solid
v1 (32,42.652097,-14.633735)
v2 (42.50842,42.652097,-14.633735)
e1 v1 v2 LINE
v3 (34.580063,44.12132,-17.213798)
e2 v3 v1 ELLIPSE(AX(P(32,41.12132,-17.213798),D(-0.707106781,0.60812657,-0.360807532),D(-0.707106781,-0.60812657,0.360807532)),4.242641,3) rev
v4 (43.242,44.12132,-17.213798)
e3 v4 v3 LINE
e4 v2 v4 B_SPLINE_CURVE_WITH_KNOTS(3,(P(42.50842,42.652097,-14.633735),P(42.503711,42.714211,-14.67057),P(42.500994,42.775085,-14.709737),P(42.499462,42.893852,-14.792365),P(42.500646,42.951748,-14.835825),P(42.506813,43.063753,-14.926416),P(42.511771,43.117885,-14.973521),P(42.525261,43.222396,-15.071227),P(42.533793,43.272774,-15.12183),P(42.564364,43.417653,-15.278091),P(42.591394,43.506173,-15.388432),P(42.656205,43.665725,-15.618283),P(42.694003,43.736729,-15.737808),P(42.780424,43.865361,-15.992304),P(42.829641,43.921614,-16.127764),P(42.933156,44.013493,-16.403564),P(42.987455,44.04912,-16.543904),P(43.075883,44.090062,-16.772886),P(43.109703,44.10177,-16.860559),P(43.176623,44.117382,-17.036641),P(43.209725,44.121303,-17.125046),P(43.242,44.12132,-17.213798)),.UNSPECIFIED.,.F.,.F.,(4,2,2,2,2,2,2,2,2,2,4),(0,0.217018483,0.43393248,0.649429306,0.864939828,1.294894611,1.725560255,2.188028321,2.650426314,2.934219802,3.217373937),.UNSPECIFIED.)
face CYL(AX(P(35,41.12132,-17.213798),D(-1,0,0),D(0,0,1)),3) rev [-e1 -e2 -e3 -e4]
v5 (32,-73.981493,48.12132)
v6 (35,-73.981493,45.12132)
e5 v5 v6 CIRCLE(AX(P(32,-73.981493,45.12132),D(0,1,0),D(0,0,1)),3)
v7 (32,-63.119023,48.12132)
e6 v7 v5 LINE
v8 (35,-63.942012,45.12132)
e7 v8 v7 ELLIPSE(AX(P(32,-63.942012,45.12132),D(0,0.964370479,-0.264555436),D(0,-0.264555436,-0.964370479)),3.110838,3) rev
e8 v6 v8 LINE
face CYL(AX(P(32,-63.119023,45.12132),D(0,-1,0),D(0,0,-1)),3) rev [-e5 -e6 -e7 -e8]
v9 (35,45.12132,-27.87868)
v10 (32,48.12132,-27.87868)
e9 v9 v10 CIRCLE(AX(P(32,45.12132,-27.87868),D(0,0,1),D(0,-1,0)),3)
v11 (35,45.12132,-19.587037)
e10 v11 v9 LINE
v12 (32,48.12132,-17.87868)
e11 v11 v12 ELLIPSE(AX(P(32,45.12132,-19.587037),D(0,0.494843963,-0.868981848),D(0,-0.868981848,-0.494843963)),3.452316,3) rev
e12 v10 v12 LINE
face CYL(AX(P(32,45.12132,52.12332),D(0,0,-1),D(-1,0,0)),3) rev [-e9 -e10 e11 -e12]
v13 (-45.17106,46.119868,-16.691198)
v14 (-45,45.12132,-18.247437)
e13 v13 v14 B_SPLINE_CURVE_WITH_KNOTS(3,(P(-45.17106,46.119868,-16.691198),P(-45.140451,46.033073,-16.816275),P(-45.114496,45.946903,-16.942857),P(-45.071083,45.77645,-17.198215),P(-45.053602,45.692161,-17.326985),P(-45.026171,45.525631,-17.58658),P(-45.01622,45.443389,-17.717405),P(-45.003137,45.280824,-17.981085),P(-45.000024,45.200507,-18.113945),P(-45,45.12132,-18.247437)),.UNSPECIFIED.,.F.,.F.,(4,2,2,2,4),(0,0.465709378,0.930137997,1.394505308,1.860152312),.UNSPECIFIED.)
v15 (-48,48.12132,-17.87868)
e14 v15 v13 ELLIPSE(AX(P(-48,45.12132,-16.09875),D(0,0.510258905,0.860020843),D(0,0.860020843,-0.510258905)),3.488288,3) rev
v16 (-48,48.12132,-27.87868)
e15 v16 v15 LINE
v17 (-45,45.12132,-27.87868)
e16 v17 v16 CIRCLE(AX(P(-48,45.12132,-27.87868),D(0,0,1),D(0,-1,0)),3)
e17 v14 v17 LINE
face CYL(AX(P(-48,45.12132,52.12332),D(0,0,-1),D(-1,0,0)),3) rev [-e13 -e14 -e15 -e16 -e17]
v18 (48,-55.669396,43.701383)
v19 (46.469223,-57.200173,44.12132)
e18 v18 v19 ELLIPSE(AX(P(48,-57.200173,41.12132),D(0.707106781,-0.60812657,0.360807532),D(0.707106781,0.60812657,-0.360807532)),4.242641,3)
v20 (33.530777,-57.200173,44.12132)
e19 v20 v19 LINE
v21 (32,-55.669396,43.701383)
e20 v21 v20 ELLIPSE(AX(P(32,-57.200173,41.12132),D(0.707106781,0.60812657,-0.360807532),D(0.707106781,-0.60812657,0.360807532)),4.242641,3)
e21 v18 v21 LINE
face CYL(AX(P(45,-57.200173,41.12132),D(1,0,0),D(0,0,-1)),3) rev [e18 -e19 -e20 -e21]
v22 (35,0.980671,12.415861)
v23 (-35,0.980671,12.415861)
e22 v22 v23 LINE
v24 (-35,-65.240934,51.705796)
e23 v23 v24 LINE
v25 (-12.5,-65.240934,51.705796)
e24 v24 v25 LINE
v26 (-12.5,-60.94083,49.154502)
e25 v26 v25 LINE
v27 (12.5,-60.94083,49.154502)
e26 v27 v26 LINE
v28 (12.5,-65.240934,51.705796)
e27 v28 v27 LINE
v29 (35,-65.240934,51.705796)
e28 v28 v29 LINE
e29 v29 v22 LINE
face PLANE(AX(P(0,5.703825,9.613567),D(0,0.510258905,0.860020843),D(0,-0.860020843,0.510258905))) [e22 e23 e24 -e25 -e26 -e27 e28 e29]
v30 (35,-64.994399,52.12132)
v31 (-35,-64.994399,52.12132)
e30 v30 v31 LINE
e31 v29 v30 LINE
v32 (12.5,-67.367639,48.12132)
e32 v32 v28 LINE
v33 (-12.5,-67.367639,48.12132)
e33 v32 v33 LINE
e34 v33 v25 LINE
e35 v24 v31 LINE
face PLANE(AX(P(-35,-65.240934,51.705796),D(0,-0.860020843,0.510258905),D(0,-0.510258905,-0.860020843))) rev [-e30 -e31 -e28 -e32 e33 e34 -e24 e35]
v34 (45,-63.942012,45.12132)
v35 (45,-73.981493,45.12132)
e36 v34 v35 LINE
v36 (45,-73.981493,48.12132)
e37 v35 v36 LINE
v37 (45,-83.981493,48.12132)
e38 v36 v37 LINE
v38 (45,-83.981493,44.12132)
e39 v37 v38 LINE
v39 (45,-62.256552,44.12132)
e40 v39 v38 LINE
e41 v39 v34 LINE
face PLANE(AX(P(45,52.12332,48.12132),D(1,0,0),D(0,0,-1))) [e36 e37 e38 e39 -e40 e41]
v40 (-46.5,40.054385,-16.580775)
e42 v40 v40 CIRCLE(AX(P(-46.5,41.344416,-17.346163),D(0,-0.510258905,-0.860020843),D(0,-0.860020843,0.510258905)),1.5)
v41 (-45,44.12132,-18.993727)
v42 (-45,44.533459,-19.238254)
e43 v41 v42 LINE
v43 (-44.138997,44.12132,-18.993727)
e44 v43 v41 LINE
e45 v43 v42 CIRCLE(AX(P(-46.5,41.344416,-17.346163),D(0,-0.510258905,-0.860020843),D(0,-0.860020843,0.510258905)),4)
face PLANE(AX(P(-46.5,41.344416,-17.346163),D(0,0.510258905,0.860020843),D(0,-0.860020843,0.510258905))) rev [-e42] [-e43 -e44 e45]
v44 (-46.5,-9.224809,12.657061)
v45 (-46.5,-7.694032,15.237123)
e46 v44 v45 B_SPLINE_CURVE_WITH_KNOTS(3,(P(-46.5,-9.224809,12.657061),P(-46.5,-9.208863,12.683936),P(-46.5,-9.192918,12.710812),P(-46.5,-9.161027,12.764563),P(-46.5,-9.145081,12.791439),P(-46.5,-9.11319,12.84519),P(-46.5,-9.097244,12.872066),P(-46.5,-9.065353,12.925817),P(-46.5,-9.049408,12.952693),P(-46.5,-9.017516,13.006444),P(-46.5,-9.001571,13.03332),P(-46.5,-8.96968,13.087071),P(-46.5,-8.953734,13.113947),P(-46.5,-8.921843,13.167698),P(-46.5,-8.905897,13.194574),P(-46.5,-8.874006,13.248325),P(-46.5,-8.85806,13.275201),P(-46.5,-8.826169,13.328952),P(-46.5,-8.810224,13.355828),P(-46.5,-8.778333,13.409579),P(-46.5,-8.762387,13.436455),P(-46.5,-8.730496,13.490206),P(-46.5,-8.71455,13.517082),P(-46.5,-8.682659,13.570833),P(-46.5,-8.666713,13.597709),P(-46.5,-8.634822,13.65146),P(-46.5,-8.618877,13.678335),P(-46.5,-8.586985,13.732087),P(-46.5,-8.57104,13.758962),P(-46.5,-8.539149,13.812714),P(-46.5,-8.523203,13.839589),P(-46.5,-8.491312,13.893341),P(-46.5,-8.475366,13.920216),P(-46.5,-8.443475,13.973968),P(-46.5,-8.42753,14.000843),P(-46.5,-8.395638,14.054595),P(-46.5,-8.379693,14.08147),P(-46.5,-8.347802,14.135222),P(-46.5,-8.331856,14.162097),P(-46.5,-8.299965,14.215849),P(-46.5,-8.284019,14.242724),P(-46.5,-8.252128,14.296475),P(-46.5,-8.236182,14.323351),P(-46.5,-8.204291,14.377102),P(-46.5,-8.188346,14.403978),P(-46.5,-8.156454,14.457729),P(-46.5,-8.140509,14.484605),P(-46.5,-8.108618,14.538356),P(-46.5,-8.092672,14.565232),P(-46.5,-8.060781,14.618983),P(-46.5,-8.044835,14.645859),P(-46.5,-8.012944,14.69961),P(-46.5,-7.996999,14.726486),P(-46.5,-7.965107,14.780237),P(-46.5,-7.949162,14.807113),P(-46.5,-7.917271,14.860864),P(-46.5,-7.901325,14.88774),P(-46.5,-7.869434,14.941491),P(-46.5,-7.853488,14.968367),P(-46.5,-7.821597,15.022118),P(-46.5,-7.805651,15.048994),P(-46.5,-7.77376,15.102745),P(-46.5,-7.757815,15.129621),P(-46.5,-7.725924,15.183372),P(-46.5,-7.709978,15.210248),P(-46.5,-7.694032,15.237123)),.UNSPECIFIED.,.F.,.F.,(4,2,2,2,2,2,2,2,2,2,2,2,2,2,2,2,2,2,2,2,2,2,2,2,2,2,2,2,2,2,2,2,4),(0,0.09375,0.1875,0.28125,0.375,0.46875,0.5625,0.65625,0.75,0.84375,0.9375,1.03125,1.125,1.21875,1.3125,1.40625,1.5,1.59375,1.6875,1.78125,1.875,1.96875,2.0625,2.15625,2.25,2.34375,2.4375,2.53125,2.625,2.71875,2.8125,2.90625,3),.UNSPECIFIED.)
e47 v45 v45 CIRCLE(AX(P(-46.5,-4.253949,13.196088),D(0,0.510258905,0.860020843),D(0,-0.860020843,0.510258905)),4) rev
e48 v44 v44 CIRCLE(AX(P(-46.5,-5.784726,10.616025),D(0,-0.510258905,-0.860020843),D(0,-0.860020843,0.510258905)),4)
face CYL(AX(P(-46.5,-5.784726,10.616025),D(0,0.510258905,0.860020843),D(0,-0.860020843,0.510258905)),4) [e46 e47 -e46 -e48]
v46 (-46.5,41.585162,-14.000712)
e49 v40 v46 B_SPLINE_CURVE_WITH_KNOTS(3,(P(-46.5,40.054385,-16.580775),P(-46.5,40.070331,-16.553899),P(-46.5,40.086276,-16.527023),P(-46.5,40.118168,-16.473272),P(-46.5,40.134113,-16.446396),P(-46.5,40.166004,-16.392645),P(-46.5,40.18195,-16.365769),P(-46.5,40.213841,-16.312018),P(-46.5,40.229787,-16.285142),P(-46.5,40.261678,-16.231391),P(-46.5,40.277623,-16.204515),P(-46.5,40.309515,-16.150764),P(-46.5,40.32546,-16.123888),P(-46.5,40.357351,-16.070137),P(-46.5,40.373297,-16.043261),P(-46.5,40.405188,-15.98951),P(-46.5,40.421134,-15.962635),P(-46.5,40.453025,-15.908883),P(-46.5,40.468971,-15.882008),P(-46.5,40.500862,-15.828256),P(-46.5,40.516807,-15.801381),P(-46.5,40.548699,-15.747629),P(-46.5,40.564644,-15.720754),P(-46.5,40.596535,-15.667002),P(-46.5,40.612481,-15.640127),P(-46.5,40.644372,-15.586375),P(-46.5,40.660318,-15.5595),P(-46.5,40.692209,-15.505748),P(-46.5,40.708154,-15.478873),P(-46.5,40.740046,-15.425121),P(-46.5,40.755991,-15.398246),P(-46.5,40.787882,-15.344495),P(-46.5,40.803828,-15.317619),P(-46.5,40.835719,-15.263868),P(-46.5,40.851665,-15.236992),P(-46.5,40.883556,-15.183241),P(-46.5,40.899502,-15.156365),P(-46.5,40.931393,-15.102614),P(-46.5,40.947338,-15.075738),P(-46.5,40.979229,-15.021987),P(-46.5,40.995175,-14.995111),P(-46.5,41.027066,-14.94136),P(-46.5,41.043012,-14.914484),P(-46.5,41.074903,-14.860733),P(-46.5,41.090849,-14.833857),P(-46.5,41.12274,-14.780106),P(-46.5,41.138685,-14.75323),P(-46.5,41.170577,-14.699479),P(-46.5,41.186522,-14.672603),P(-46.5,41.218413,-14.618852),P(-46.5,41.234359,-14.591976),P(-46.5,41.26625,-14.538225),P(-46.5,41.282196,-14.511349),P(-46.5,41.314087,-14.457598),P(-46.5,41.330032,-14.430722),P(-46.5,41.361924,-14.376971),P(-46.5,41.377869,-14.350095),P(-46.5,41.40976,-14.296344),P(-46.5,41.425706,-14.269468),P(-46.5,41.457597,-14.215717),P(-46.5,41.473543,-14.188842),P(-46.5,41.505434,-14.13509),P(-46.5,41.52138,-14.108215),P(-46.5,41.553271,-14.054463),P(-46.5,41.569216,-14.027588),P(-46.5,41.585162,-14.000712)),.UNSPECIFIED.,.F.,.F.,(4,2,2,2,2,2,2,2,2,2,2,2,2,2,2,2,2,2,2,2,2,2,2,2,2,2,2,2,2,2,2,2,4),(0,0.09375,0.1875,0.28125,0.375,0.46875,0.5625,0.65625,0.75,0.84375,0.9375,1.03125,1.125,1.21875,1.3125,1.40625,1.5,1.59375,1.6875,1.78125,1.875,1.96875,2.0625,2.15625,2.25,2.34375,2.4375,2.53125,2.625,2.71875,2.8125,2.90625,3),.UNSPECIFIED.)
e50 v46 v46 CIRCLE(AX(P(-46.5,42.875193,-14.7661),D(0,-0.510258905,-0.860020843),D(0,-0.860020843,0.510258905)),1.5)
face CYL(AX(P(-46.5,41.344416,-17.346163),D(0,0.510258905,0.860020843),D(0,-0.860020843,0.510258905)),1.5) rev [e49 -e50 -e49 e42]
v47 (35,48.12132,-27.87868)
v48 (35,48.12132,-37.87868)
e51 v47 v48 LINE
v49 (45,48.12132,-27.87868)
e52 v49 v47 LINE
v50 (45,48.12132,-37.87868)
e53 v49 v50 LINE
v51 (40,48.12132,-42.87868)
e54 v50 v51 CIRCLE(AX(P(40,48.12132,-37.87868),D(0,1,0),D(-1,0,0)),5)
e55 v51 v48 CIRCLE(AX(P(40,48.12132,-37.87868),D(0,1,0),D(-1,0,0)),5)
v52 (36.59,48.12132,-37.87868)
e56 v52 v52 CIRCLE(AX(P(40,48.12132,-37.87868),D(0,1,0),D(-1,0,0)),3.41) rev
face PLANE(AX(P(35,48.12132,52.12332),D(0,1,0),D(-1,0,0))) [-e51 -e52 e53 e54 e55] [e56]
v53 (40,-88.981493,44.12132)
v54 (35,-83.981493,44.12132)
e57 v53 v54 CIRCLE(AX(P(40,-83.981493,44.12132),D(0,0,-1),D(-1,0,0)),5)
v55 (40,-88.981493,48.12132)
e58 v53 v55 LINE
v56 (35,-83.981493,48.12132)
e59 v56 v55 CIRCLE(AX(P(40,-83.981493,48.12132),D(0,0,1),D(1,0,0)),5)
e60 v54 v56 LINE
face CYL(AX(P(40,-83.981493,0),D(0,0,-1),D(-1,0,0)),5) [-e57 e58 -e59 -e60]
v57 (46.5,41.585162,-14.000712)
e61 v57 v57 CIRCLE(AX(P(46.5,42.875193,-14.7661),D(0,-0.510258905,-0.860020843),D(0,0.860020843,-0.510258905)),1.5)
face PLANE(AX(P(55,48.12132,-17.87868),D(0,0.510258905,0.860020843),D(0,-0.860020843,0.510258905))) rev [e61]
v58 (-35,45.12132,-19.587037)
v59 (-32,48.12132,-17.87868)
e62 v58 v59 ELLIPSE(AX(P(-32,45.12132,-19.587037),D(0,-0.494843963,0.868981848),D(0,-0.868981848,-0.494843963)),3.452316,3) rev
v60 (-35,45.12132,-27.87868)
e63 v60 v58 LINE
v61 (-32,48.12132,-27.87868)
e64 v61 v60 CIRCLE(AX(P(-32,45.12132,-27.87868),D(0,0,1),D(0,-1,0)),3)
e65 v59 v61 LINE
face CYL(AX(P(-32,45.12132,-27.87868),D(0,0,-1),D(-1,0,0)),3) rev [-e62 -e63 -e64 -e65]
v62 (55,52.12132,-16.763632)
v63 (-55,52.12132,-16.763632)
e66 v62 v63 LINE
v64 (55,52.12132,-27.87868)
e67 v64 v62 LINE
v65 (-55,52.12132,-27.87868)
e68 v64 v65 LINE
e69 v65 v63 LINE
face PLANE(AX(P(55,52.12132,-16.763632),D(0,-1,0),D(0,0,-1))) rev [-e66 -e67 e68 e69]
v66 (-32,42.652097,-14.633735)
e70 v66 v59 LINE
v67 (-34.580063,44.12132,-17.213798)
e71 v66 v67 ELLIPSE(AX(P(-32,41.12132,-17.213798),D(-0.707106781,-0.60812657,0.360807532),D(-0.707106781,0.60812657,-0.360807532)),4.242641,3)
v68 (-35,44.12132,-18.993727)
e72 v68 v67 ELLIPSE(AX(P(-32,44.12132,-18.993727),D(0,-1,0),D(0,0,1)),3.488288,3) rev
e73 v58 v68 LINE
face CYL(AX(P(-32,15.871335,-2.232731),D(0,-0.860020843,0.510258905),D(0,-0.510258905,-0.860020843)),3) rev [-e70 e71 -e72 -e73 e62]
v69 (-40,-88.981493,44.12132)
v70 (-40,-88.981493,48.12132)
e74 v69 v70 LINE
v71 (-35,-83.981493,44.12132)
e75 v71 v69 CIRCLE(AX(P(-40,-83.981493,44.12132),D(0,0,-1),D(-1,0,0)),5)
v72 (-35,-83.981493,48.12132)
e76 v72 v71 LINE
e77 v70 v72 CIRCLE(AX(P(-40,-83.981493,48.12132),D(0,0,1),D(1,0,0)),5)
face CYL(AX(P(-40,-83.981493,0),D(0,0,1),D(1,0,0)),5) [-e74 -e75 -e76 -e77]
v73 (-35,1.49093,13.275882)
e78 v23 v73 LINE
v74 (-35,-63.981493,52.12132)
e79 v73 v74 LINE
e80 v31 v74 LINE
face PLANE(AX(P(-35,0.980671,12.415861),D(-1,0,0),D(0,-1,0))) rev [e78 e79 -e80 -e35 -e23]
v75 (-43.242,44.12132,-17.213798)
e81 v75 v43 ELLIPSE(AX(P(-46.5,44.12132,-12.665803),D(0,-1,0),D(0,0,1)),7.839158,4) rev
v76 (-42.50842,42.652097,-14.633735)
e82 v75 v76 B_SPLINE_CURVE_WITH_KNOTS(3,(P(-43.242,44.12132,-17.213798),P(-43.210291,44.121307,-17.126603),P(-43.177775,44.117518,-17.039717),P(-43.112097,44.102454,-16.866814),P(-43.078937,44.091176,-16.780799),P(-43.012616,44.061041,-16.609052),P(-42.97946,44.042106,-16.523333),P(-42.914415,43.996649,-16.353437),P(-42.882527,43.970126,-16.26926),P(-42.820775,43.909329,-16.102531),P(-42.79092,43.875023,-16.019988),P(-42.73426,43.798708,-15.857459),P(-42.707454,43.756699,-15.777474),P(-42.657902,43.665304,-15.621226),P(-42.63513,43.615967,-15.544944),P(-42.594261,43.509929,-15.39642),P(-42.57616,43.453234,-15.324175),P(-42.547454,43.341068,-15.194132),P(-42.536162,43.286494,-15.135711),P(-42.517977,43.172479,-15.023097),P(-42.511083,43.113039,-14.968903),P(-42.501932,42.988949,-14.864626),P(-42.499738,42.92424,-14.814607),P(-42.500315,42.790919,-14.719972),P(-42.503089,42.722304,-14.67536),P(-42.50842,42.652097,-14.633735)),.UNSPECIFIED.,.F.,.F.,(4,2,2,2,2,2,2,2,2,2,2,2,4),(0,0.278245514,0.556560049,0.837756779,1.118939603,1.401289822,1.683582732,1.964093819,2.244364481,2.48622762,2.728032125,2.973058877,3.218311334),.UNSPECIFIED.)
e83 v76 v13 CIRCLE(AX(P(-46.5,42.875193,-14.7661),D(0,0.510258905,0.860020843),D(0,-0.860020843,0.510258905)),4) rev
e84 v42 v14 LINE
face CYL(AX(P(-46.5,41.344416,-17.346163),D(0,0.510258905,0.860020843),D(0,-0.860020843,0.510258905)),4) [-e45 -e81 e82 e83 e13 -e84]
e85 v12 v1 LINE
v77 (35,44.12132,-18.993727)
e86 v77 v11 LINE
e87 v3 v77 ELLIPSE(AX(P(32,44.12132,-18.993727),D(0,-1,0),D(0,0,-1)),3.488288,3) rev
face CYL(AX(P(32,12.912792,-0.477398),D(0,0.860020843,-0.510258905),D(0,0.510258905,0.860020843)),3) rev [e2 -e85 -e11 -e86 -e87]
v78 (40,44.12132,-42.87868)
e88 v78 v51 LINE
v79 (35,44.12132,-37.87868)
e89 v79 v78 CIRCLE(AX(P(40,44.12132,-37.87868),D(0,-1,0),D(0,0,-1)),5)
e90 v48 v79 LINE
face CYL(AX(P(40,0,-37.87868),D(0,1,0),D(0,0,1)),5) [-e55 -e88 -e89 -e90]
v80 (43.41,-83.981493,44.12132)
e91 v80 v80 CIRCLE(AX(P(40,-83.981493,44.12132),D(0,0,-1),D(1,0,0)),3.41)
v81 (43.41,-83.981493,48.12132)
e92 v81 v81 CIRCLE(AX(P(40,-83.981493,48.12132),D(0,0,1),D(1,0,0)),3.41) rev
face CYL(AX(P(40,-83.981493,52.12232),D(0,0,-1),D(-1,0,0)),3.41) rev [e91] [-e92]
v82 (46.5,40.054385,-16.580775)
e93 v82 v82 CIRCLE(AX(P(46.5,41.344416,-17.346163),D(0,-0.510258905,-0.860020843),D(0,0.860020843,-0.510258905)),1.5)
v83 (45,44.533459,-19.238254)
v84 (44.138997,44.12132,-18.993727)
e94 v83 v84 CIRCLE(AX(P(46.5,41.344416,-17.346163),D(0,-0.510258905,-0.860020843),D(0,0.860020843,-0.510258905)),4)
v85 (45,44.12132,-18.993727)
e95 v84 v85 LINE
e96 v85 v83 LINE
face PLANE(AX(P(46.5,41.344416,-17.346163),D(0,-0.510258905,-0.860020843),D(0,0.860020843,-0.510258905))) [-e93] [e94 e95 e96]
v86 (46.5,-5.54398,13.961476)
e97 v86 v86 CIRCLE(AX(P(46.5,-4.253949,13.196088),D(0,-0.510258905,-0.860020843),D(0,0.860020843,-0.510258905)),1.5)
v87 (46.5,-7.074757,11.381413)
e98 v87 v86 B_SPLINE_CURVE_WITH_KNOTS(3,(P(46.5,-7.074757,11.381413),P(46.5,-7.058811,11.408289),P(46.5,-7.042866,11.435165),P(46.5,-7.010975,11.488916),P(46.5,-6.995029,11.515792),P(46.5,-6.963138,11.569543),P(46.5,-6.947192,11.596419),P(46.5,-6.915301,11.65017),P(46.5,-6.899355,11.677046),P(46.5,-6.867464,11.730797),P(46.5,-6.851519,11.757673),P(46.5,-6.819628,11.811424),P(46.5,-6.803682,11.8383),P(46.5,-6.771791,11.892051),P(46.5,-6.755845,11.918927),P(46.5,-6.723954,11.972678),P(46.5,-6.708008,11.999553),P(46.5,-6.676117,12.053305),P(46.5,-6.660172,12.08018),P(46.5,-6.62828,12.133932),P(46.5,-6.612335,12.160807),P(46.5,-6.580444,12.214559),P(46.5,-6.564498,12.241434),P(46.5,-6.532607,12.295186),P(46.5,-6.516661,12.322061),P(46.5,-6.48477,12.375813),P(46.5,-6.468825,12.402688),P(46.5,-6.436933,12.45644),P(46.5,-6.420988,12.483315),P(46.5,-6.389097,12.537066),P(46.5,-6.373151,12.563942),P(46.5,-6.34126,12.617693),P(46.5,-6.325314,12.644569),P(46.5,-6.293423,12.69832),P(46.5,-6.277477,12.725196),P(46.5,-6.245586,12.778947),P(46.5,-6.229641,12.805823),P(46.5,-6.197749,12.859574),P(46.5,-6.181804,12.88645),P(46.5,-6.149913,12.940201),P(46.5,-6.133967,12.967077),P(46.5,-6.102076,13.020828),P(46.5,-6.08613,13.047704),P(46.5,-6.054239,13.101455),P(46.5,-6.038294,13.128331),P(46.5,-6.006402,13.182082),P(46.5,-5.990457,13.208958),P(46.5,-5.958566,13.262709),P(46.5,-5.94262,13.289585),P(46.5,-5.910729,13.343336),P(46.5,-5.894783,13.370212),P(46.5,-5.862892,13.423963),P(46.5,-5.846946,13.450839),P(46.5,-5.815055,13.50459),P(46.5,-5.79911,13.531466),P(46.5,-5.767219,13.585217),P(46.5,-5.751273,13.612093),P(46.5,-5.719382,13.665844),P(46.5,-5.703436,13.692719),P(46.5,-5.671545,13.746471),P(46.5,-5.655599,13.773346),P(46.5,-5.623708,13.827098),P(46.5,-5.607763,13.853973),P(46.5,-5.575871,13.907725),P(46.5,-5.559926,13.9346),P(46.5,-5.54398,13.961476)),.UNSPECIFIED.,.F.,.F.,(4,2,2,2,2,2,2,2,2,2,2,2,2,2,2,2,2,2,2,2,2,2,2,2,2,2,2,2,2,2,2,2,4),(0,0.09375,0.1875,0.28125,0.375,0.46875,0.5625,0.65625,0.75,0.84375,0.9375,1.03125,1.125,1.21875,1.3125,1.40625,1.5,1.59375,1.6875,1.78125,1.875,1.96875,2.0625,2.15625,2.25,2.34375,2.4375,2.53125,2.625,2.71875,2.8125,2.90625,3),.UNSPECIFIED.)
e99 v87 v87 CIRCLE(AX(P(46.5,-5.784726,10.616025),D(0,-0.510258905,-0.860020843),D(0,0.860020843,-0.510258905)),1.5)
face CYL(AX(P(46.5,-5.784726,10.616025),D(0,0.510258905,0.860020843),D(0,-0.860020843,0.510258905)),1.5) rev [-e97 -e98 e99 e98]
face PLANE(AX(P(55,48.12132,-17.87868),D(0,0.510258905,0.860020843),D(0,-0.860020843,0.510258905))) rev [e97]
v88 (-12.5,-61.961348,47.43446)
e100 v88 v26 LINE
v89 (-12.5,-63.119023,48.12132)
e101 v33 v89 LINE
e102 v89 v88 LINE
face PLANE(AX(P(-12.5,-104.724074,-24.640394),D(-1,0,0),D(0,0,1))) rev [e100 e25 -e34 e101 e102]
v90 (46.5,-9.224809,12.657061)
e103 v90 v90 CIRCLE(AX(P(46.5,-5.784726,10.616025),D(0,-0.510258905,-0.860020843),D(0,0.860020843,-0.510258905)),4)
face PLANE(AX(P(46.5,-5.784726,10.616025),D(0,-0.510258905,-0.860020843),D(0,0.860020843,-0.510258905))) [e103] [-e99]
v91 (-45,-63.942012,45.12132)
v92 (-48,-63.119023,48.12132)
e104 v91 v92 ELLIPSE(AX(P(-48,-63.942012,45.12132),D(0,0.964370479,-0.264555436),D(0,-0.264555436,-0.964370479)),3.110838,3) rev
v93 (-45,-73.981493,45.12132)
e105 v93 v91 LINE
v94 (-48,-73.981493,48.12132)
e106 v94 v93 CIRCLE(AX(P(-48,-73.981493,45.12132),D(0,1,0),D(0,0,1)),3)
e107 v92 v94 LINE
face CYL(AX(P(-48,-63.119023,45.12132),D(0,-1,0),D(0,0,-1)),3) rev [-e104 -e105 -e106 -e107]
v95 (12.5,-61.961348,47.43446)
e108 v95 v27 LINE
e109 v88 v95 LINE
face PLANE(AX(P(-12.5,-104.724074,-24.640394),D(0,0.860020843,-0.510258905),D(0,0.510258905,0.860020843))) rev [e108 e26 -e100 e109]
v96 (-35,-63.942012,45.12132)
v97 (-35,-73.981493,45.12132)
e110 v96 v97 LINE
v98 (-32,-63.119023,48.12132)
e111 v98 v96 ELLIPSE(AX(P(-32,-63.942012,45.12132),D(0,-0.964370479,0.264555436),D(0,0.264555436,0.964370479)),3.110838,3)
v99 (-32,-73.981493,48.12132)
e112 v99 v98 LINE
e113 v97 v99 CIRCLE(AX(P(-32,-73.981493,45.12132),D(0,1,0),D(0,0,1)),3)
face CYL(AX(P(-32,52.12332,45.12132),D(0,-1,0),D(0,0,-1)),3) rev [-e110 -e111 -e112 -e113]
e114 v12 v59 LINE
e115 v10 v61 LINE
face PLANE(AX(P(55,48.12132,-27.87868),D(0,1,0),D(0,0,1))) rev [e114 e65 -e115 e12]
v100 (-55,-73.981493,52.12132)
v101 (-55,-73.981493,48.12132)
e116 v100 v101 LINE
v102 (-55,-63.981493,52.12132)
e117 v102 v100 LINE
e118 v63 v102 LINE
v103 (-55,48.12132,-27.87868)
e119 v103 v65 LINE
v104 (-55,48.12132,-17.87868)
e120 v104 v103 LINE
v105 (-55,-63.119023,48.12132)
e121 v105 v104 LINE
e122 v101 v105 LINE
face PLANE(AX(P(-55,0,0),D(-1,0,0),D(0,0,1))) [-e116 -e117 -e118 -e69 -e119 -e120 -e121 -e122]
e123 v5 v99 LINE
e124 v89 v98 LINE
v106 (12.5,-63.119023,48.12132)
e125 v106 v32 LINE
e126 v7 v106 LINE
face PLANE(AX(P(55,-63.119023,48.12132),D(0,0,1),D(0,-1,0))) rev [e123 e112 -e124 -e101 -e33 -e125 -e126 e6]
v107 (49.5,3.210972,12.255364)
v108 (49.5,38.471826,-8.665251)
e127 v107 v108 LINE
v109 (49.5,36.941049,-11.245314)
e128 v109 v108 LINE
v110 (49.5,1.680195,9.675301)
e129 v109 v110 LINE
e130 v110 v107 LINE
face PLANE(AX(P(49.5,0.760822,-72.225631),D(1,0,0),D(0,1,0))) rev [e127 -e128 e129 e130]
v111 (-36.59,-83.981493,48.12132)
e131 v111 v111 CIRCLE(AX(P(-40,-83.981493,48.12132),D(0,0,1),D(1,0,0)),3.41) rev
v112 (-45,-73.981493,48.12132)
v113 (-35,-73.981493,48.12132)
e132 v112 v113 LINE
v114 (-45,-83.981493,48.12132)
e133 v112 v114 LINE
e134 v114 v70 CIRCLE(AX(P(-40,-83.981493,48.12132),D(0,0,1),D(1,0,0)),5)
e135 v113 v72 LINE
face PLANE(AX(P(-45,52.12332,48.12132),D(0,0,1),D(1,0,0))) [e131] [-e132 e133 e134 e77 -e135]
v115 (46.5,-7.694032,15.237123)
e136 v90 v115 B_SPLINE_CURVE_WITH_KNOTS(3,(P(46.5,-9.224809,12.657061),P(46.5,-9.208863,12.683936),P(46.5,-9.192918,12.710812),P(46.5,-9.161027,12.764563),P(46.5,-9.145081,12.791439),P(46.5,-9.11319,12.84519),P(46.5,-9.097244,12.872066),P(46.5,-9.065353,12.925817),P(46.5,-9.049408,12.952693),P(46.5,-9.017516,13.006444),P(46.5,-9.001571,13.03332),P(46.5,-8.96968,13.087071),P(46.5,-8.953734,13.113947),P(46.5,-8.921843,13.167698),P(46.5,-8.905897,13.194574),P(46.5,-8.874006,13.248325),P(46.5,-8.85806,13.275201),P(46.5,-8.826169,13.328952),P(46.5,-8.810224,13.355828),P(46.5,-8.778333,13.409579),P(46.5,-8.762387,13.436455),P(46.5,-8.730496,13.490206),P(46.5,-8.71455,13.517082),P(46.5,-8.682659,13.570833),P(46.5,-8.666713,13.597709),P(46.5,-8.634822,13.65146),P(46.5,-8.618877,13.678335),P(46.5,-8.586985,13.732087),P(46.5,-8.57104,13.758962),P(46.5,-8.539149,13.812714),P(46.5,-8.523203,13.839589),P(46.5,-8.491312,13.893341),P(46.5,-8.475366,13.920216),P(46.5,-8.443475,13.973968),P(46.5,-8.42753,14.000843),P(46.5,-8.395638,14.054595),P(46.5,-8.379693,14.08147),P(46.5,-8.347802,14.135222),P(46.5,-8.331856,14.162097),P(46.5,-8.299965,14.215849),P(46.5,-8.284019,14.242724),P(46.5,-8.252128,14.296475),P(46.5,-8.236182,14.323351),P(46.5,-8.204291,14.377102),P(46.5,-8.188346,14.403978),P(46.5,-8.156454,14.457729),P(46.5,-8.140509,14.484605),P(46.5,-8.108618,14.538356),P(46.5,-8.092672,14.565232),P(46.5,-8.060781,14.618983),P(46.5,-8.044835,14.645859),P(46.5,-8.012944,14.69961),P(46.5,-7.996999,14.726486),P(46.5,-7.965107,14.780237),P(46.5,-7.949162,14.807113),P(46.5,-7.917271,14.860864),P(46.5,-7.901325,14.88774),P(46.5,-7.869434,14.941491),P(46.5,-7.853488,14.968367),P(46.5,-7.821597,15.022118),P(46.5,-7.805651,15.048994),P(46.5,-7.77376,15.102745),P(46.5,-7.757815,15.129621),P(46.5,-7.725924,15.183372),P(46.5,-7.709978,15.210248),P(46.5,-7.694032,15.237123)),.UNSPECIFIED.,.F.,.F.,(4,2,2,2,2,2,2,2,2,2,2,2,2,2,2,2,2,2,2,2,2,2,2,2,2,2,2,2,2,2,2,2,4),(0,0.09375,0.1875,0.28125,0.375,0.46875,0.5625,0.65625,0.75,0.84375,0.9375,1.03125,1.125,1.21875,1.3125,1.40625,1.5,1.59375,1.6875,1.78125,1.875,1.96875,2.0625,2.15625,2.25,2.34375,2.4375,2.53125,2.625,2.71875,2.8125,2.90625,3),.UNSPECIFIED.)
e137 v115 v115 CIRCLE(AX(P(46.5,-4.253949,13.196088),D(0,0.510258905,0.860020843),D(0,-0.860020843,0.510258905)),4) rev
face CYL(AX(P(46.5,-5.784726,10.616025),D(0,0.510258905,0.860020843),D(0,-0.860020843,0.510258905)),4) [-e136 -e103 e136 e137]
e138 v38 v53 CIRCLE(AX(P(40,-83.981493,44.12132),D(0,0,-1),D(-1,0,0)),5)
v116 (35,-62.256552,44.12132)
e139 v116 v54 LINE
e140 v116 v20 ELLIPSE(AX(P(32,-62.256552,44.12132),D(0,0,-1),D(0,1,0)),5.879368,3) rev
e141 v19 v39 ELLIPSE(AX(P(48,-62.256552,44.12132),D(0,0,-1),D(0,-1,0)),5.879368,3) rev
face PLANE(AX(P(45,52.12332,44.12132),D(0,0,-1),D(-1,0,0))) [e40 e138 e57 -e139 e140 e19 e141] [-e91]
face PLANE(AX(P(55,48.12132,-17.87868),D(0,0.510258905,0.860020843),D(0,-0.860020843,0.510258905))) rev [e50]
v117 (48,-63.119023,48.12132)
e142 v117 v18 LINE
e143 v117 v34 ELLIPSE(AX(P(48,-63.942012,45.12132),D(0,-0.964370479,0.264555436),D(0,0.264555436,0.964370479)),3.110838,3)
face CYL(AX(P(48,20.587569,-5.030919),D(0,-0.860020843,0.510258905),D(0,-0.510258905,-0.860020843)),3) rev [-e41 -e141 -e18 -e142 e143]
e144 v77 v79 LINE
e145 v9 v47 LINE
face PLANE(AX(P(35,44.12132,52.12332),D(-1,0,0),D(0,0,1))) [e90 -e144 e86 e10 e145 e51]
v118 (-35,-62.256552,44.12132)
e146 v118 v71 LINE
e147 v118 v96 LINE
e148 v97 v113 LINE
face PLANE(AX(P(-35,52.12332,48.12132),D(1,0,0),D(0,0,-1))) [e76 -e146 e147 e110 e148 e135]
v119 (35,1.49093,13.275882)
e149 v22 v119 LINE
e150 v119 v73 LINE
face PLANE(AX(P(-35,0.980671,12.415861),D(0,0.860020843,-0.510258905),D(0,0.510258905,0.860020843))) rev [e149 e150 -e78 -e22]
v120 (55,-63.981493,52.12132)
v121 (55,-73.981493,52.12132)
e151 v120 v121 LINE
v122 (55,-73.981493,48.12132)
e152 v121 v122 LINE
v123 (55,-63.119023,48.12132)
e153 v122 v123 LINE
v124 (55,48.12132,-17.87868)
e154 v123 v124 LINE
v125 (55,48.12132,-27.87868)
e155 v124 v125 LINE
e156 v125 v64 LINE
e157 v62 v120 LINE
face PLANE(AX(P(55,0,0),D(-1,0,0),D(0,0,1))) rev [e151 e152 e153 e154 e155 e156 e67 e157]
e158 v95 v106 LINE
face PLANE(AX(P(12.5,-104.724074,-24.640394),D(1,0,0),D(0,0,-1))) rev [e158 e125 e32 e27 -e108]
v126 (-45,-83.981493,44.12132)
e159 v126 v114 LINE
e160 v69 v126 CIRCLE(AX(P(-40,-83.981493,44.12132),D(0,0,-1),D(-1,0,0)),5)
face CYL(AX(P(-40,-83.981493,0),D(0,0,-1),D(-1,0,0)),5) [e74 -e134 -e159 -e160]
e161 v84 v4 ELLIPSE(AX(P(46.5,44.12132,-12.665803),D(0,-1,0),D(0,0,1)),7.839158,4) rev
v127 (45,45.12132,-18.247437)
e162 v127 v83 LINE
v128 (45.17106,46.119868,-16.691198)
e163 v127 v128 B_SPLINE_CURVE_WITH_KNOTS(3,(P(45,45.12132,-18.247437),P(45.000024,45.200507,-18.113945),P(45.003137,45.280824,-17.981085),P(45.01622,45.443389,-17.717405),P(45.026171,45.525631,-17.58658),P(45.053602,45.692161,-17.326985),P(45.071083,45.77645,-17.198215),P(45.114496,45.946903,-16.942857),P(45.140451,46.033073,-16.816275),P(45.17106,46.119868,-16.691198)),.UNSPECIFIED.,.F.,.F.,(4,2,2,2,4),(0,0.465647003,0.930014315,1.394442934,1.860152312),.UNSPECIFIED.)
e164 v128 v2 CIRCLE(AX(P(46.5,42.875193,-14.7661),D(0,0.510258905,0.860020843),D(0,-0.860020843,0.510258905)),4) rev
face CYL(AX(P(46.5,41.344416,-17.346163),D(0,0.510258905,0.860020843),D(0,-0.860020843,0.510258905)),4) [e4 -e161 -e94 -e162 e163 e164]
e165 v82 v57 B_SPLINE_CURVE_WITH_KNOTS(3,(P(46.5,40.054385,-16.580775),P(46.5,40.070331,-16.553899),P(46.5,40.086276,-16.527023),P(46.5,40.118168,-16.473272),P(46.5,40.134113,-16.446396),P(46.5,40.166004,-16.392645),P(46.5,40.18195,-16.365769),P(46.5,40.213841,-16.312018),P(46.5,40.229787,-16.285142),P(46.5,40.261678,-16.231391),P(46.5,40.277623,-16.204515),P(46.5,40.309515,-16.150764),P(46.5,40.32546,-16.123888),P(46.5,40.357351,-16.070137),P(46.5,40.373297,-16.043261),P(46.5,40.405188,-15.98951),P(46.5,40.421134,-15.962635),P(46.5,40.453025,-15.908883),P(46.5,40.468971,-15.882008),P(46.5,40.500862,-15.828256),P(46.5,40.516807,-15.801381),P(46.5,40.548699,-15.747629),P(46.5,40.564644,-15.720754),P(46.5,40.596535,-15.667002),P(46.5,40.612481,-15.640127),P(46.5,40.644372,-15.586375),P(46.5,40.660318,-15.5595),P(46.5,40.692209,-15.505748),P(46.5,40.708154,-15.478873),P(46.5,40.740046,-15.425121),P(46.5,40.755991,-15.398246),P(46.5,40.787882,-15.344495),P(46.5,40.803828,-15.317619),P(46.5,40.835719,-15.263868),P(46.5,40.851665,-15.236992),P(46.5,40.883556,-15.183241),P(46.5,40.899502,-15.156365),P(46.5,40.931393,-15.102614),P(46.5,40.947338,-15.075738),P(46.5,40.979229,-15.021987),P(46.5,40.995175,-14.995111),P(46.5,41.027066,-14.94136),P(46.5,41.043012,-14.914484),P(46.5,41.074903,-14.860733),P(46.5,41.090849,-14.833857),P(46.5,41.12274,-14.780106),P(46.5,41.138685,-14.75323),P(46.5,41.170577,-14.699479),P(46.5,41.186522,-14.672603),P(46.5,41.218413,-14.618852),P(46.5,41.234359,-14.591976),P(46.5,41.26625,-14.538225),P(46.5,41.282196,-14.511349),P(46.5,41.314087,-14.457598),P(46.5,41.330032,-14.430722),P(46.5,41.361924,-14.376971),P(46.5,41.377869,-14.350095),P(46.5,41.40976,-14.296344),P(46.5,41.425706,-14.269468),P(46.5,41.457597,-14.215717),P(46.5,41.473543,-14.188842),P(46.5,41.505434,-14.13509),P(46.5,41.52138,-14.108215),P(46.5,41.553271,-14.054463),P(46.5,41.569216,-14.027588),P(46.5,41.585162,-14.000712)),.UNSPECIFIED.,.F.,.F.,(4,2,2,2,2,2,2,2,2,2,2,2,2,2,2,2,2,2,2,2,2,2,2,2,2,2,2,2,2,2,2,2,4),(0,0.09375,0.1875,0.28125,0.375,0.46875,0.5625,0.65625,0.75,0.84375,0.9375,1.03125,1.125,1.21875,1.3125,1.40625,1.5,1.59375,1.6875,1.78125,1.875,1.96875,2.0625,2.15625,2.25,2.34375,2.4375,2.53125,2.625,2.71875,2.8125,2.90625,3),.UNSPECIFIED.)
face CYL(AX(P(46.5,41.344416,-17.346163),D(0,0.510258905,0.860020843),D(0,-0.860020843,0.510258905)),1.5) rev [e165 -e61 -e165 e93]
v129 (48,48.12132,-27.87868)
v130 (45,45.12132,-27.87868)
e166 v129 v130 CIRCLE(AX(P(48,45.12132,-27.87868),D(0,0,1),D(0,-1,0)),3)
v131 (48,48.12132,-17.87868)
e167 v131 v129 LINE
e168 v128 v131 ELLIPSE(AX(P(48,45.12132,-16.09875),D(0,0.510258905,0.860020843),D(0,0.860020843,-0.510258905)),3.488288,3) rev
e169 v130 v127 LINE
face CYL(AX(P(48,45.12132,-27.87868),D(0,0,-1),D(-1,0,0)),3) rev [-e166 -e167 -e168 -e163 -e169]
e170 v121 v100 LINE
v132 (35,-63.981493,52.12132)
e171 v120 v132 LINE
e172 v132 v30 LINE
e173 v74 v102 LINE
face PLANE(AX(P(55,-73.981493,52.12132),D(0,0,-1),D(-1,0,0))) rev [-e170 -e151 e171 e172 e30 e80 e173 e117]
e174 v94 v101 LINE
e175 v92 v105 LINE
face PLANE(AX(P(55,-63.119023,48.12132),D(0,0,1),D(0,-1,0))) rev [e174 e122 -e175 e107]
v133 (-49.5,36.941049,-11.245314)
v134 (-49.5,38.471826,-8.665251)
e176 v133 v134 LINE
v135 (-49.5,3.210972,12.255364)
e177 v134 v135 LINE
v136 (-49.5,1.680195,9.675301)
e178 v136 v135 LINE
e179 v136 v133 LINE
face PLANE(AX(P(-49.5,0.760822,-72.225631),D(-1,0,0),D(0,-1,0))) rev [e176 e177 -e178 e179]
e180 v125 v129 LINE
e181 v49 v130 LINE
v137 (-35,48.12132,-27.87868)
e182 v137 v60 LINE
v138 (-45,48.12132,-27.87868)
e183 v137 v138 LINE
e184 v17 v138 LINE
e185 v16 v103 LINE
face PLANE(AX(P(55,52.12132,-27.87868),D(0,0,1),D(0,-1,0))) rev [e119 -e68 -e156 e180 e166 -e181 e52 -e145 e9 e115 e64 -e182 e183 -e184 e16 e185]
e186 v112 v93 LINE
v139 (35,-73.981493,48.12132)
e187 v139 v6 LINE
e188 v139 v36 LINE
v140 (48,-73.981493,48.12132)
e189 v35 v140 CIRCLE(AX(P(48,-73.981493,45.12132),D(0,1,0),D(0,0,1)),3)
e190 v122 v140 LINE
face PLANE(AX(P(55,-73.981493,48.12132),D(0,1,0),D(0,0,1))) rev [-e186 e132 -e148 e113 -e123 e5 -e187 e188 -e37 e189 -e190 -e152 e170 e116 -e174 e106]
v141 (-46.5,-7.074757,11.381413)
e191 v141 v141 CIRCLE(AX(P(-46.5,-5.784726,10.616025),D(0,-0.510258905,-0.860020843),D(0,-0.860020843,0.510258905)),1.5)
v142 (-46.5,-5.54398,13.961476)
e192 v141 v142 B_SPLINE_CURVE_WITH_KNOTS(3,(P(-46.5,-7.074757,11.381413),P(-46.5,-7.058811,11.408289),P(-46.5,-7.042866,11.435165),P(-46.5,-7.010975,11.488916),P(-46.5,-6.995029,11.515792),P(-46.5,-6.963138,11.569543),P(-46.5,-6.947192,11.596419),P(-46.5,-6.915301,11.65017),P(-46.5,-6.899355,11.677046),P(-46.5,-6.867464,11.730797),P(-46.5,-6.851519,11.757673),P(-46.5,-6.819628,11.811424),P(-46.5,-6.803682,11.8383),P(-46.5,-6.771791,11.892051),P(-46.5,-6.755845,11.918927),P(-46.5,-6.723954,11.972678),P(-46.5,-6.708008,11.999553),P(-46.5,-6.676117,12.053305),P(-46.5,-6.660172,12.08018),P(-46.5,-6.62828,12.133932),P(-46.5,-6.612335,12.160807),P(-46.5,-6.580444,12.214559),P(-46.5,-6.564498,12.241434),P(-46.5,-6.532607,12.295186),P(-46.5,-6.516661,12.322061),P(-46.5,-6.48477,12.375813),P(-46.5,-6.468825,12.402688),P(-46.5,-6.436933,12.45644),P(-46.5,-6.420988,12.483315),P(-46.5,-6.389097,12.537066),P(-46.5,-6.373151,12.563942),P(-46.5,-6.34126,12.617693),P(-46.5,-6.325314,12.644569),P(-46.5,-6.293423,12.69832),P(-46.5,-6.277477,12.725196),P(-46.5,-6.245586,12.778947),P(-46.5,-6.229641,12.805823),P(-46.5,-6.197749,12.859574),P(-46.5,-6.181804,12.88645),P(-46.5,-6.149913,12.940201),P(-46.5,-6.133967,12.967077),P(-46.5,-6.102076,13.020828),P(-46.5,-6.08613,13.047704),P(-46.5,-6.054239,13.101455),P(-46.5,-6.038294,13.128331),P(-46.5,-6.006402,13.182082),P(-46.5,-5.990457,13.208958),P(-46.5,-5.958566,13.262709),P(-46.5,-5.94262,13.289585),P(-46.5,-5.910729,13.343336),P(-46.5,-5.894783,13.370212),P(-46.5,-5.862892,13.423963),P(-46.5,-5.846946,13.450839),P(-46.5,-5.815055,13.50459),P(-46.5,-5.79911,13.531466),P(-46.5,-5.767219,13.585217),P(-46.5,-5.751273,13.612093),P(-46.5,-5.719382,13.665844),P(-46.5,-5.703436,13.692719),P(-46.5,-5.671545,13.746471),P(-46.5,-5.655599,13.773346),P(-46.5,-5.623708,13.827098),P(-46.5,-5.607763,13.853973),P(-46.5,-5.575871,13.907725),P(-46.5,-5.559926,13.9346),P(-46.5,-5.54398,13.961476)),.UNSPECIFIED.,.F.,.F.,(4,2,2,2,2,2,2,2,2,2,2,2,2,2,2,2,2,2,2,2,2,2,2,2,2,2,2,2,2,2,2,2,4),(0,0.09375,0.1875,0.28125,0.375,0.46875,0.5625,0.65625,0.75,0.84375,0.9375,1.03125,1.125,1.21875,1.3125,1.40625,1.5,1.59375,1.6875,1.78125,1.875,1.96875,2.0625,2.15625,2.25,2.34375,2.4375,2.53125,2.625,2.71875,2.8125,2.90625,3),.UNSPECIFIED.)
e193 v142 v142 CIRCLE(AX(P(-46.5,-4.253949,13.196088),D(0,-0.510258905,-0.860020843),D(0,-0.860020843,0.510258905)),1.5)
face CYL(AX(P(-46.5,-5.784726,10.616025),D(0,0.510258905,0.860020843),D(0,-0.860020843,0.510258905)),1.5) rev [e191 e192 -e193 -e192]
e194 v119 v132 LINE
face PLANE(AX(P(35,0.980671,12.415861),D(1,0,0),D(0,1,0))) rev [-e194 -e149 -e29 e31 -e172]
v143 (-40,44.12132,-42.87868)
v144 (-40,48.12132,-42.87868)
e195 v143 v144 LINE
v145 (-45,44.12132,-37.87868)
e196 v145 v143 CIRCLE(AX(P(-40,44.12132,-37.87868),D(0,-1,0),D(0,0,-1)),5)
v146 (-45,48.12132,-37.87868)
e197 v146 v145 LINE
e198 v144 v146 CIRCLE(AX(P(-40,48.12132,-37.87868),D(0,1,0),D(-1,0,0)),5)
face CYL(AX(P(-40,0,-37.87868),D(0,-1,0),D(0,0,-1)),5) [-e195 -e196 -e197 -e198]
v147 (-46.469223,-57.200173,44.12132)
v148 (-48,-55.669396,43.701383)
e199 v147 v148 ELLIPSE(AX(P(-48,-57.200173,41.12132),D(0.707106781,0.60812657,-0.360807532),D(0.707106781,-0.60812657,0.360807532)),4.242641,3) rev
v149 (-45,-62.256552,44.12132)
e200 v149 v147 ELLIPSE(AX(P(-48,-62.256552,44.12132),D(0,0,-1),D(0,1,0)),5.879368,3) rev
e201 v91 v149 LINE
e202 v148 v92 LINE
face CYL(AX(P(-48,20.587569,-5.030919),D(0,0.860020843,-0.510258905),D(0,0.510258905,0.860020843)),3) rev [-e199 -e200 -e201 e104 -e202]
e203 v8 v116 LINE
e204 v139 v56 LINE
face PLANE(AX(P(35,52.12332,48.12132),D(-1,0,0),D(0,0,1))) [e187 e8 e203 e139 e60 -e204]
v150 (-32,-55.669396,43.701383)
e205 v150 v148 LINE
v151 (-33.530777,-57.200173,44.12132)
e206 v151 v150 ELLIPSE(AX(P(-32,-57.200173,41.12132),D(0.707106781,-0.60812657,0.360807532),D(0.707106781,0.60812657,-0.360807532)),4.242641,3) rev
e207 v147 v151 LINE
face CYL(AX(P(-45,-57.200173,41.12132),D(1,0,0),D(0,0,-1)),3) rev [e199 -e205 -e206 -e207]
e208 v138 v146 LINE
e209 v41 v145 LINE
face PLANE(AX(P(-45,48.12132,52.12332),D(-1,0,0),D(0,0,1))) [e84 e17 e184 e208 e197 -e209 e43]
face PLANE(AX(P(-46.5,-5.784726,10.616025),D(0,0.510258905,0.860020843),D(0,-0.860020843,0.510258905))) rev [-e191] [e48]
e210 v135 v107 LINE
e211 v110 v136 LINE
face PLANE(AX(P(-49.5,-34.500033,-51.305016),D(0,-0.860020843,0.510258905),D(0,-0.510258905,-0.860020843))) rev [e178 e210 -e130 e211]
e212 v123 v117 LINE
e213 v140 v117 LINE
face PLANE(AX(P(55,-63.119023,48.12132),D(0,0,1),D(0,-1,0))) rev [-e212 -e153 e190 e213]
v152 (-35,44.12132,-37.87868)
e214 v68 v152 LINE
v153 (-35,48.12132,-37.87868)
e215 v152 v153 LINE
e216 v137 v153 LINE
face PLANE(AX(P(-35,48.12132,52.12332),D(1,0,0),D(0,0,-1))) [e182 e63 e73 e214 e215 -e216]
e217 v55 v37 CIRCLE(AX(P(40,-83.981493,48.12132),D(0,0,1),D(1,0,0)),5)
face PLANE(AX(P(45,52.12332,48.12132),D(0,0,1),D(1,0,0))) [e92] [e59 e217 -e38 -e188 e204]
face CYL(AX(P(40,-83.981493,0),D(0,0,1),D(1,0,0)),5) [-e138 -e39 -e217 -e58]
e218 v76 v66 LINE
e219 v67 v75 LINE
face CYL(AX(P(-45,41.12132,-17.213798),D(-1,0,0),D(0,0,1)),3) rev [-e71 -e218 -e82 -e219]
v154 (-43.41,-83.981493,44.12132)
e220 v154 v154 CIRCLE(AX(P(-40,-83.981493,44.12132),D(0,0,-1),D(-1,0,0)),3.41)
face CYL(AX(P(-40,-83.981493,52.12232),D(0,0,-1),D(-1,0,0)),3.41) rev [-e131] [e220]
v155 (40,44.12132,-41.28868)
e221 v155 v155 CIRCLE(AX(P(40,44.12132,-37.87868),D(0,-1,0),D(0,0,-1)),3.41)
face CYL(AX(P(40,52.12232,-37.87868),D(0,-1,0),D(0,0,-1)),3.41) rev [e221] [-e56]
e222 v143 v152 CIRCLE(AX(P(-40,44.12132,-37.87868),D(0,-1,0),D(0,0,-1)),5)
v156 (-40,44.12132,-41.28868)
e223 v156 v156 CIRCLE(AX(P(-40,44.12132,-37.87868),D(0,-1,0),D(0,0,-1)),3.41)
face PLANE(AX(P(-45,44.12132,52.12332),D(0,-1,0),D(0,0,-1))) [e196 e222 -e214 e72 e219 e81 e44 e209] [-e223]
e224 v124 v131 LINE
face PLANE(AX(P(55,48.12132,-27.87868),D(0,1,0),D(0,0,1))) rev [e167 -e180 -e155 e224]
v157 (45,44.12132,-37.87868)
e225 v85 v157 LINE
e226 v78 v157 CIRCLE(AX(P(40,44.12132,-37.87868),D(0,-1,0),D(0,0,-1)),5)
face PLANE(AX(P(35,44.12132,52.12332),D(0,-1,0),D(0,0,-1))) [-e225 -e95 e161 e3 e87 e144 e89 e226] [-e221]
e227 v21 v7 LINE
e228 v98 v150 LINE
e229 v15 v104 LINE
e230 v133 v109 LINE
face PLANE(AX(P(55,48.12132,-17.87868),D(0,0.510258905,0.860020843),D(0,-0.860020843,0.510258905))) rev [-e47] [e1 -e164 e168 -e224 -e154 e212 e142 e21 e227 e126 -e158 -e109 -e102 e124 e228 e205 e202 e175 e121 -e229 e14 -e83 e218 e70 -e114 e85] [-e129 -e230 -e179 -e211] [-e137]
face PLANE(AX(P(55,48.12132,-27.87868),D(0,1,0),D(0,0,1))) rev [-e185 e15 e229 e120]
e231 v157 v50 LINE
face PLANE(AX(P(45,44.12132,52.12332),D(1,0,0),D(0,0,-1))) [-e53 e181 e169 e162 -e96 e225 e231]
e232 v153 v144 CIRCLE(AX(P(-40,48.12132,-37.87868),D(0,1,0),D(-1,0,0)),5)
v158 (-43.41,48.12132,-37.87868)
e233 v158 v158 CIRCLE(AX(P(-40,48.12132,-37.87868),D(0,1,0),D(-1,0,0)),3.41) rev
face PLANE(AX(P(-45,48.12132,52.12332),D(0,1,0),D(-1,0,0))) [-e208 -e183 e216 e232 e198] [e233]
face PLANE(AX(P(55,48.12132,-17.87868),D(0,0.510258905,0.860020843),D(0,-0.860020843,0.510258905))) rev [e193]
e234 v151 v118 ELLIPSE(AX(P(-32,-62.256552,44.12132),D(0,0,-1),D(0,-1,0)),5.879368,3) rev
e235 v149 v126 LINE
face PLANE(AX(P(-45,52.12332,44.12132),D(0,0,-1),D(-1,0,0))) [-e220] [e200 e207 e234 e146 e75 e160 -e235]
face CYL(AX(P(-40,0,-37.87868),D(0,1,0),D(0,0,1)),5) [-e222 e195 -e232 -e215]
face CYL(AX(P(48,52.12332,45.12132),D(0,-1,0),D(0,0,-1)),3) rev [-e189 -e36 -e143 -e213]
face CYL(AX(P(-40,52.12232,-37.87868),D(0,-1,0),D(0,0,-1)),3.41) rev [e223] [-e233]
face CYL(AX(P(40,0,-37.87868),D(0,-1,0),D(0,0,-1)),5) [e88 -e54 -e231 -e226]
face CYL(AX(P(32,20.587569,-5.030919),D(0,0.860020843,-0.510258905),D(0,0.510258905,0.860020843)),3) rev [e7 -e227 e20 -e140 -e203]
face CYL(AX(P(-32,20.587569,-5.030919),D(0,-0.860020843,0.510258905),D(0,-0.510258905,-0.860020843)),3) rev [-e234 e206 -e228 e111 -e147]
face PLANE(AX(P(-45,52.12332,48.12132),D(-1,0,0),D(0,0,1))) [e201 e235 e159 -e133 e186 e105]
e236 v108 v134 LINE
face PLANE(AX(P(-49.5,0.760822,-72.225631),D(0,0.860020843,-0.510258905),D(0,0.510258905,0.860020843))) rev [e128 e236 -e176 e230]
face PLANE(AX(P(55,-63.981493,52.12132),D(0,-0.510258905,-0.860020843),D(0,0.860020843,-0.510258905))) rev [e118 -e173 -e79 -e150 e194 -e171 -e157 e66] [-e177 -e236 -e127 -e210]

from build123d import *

# Parameters (mm, degrees)
BOSS_EXTRUDE1_DEPTH             = 55
CUT_EXTRUDE1_REACH              = 107.787
SKETCH3_W                       = 99
SKETCH3_H                       = 41
SKETCH4_W                       = 70
SKETCH4_H                       = 77
CUT_EXTRUDE2_DEPTH              = 1
SKETCH5_R                       = 4
SKETCH5_R_2                     = 1.5
BOSS_EXTRUDE2_DEPTH             = 3
SKETCH6_W                       = 10
SKETCH6_H                       = 4
BOSS_EXTRUDE3_DEPTH             = 15
BOSS_EXTRUDE3_DIRECTION_2_REACH = 124.058
CUT_EXTRUDE3_REACH              = 142.321
SKETCH7_R                       = 3.41
FILLET1_R                       = 3
FILLET2_R                       = 5
CUT_EXTRUDE4_REACH              = 112.137
SKETCH8_W                       = 25
SKETCH8_H                       = 5
SKETCH9_W                       = 10
SKETCH9_H                       = 4
BOSS_EXTRUDE4_DEPTH             = 15
BOSS_EXTRUDE4_DIRECTION_2_REACH = 149.117
CUT_EXTRUDE5_REACH              = 138.058
SKETCH10_R                      = 3.41
FILLET3_R                       = 3
FILLET4_R                       = 5


with BuildPart() as part:
    # Sketch2 → Boss-Extrude1 (new, symmetric)
    with BuildSketch(Plane(origin=(0, 0, 0), x_dir=(0, 0, -1), z_dir=(1, 0, 0))):
        Polygon((-52.121320344, -63.981493427), (16.76363182, 52.121320344), (27.878679656, 52.121320344), (27.878679656, 48.121320344), (17.878679656, 48.121320344), (-48.121320344, -63.119022696), (-48.121320344, -73.981493427), (-52.121320344, -73.981493427), align=None)
    extrude(amount=BOSS_EXTRUDE1_DEPTH, both=True)

    # Sketch3 → Cut-Extrude1 (cut, up to next)
    with BuildSketch(Plane(origin=(0, 6.214083509, 10.473587595), x_dir=(1, 0, 0), z_dir=(0, 0.5102589049122125, 0.8600208427461452)), mode=Mode.PRIVATE) as cut_extrude1_sk1:
        with Locations((0, 17.008093979)):
            Rectangle(SKETCH3_W, SKETCH3_H)
    cut_extrude1_tool1 = extrude(cut_extrude1_sk1.sketch, amount=-CUT_EXTRUDE1_REACH, mode=Mode.PRIVATE) & part.part
    add(cut_extrude1_tool1.solids().sort_by_distance((0, 20.841399, 1.795056))[0], mode=Mode.SUBTRACT)

    # Sketch4 → Cut-Extrude2 (cut)
    with BuildSketch(Plane(origin=(0, 6.214083509, 10.473587595), x_dir=(1, 0, 0), z_dir=(0, 0.5102589049122125, 0.8600208427461452))):
        with Locations((0, -43.991906021)):
            Rectangle(SKETCH4_W, SKETCH4_H)
    extrude(amount=-CUT_EXTRUDE2_DEPTH, mode=Mode.SUBTRACT)

    # Sketch5 → Boss-Extrude2 (add)
    # profile 1 of 4: a face of its own
    with BuildSketch(Plane(origin=(0, 4.683306794, 7.893525066), x_dir=(-1, 0, 0), z_dir=(0, -0.5102589049122127, -0.8600208427461451))):
        with Locations(Location((-46.5, 44.408093979, 0), (0, 0, 270))):
            Circle(SKETCH5_R)
        with Locations(Location((-46.5, 44.408093979, 0), (0, 0, 270))):
            Circle(SKETCH5_R_2, mode=Mode.SUBTRACT)
    # profile 2 of 4: a face of its own
    with BuildSketch(Plane(origin=(0, 4.683306794, 7.893525066), x_dir=(-1, 0, 0), z_dir=(0, -0.5102589049122127, -0.8600208427461451))):
        with Locations(Location((-46.5, -10.391906021, 0), (0, 0, 270))):
            Circle(SKETCH5_R)
        with Locations(Location((-46.5, -10.391906021, 0), (0, 0, 270))):
            Circle(SKETCH5_R_2, mode=Mode.SUBTRACT)
    # profile 3 of 4: a face of its own
    with BuildSketch(Plane(origin=(0, 4.683306794, 7.893525066), x_dir=(-1, 0, 0), z_dir=(0, -0.5102589049122127, -0.8600208427461451))):
        with Locations(Location((46.5, -10.391906021, 0), (0, 0, 270))):
            Circle(SKETCH5_R)
        with Locations(Location((46.5, -10.391906021, 0), (0, 0, 270))):
            Circle(SKETCH5_R_2, mode=Mode.SUBTRACT)
    # profile 4 of 4: a face of its own
    with BuildSketch(Plane(origin=(0, 4.683306794, 7.893525066), x_dir=(-1, 0, 0), z_dir=(0, -0.5102589049122127, -0.8600208427461451))):
        with Locations(Location((46.5, 44.408093979, 0), (0, 0, 270))):
            Circle(SKETCH5_R)
        with Locations(Location((46.5, 44.408093979, 0), (0, 0, 270))):
            Circle(SKETCH5_R_2, mode=Mode.SUBTRACT)
    extrude(amount=BOSS_EXTRUDE2_DEPTH)

    # Sketch6 → Boss-Extrude3 (add)
    with BuildSketch(Plane(origin=(0, 0, -27.878679656), x_dir=(-1, 0, 0), z_dir=(0, 0, -1))):
        with Locations((40, 46.121320344)):
            Rectangle(SKETCH6_W, SKETCH6_H)
        with Locations((-40, 46.121320344)):
            Rectangle(SKETCH6_W, SKETCH6_H)
    extrude(amount=BOSS_EXTRUDE3_DEPTH)

    # Sketch6 → Boss-Extrude3 direction 2 (add, up to next)
    with BuildSketch(Plane(origin=(0, 0, -27.878679656), x_dir=(-1, 0, 0), z_dir=(0, 0, -1)), mode=Mode.PRIVATE) as boss_extrude3_direction_2_sk1:
        with Locations((40, 46.121320344)):
            Rectangle(SKETCH6_W, SKETCH6_H)
    boss_extrude3_direction_2_tool1 = extrude(boss_extrude3_direction_2_sk1.sketch, amount=-BOSS_EXTRUDE3_DIRECTION_2_REACH, mode=Mode.PRIVATE) - part.part
    # Sketch6 → Boss-Extrude3 direction 2 (add, up to next)
    with BuildSketch(Plane(origin=(0, 0, -27.878679656), x_dir=(-1, 0, 0), z_dir=(0, 0, -1)), mode=Mode.PRIVATE) as boss_extrude3_direction_2_sk2:
        with Locations((-40, 46.121320344)):
            Rectangle(SKETCH6_W, SKETCH6_H)
    boss_extrude3_direction_2_tool2 = extrude(boss_extrude3_direction_2_sk2.sketch, amount=-BOSS_EXTRUDE3_DIRECTION_2_REACH, mode=Mode.PRIVATE) - part.part
    add(boss_extrude3_direction_2_tool1.solids().sort_by_distance((-40, 46.12132, -27.87868))[0])
    add(boss_extrude3_direction_2_tool2.solids().sort_by_distance((40, 46.12132, -27.87868))[0])

    # Sketch7 → Cut-Extrude3 (cut, up to next)
    with BuildSketch(Plane.XZ.offset(-44.121320344), mode=Mode.PRIVATE) as cut_extrude3_sk1:
        with Locations(Location((-40, -37.878679656, 0), (0, 0, 270))):
            Circle(SKETCH7_R)
    cut_extrude3_tool1 = extrude(cut_extrude3_sk1.sketch, amount=-CUT_EXTRUDE3_REACH, mode=Mode.PRIVATE) & part.part
    # Sketch7 → Cut-Extrude3 (cut, up to next)
    with BuildSketch(Plane.XZ.offset(-44.121320344), mode=Mode.PRIVATE) as cut_extrude3_sk2:
        with Locations(Location((40, -37.878679656, 0), (0, 0, 270))):
            Circle(SKETCH7_R)
    cut_extrude3_tool2 = extrude(cut_extrude3_sk2.sketch, amount=-CUT_EXTRUDE3_REACH, mode=Mode.PRIVATE) & part.part
    add(cut_extrude3_tool1.solids().sort_by_distance((-40, 44.12132, -37.87868))[0], mode=Mode.SUBTRACT)
    add(cut_extrude3_tool2.solids().sort_by_distance((40, 44.12132, -37.87868))[0], mode=Mode.SUBTRACT)

    # Fillet1
    fillet1_edges = [part.edges().sort_by_distance(p)[0] for p in [
        (-35, 46.121320344, -16.692059799),
        (35, 46.121320344, -16.692059799),
        (45, 48.121320344, -22.878679656),
        (35, 48.121320344, -22.878679656),
        (38.885828328, 44.121320344, -15.505439942),
        (-38.885828328, 44.121320344, -15.505439942),
        (-45, 48.121320344, -22.878679656),
        (-35, 48.121320344, -22.878679656),
    ]]
    fillet(fillet1_edges, radius=FILLET1_R)

    # Fillet2
    fillet2_edges = [part.edges().sort_by_distance(p)[0] for p in [
        (45, 46.121320344, -42.878679656),
        (35, 46.121320344, -42.878679656),
        (-35, 46.121320344, -42.878679656),
        (-45, 46.121320344, -42.878679656),
    ]]
    fillet(fillet2_edges, radius=FILLET2_R - 0.0001)  # a hair under: the kernel refuses the full size

    # Sketch8 → Cut-Extrude4 (cut, up to next)
    with BuildSketch(Plane(origin=(0, 5.703824604, 9.613566752), x_dir=(1, 0, 0), z_dir=(0, 0.5102589049122124, 0.8600208427461452)), mode=Mode.PRIVATE) as cut_extrude4_sk1:
        with Locations((0, -79.991906021)):
            Rectangle(SKETCH8_W, SKETCH8_H)
    cut_extrude4_tool1 = extrude(cut_extrude4_sk1.sketch, amount=-CUT_EXTRUDE4_REACH, mode=Mode.PRIVATE) & part.part
    add(cut_extrude4_tool1.solids().sort_by_distance((0, -63.090882, 50.430149))[0], mode=Mode.SUBTRACT)

    # Sketch9 → Boss-Extrude4 (add)
    with BuildSketch(Plane.XZ.offset(73.981493427)):
        with Locations((-40, 46.121320344)):
            Rectangle(SKETCH9_W, SKETCH9_H)
        with Locations((40, 46.121320344)):
            Rectangle(SKETCH9_W, SKETCH9_H)
    extrude(amount=BOSS_EXTRUDE4_DEPTH)

    # Boss-Extrude4 direction 2: up to this plane
    boss_extrude4_direction_2_end = Plane(origin=(55, 48.121320344, -17.878679656), z_dir=(0, 0.5102589049122126, 0.8600208427461451))
    # Sketch9 → Boss-Extrude4 direction 2 (add, up to the surface)
    with BuildSketch(Plane.XZ.offset(73.981493427), mode=Mode.PRIVATE) as boss_extrude4_direction_2_sk1:
        with Locations((-40, 46.121320344)):
            Rectangle(SKETCH9_W, SKETCH9_H)
    boss_extrude4_direction_2_tool1 = split(extrude(boss_extrude4_direction_2_sk1.sketch, amount=-BOSS_EXTRUDE4_DIRECTION_2_REACH, mode=Mode.PRIVATE), bisect_by=boss_extrude4_direction_2_end, keep=Keep.BOTH, mode=Mode.PRIVATE)
    add(boss_extrude4_direction_2_tool1.solids().sort_by_distance((-40, -73.981493, 46.12132))[0])
    # Sketch9 → Boss-Extrude4 direction 2 (add, up to the surface)
    with BuildSketch(Plane.XZ.offset(73.981493427), mode=Mode.PRIVATE) as boss_extrude4_direction_2_sk2:
        with Locations((40, 46.121320344)):
            Rectangle(SKETCH9_W, SKETCH9_H)
    boss_extrude4_direction_2_tool2 = split(extrude(boss_extrude4_direction_2_sk2.sketch, amount=-BOSS_EXTRUDE4_DIRECTION_2_REACH, mode=Mode.PRIVATE), bisect_by=boss_extrude4_direction_2_end, keep=Keep.BOTH, mode=Mode.PRIVATE)
    add(boss_extrude4_direction_2_tool2.solids().sort_by_distance((40, -73.981493, 46.12132))[0])

    # Sketch10 → Cut-Extrude5 (cut, up to next)
    with BuildSketch(Plane(origin=(0, 0, 44.121320344), x_dir=(-1, 0, 0), z_dir=(0, 0, -1)), mode=Mode.PRIVATE) as cut_extrude5_sk1:
        with Locations((40, -83.981493427)):
            Circle(SKETCH10_R)
    cut_extrude5_tool1 = extrude(cut_extrude5_sk1.sketch, amount=-CUT_EXTRUDE5_REACH, mode=Mode.PRIVATE) & part.part
    # Sketch10 → Cut-Extrude5 (cut, up to next)
    with BuildSketch(Plane(origin=(0, 0, 44.121320344), x_dir=(-1, 0, 0), z_dir=(0, 0, -1)), mode=Mode.PRIVATE) as cut_extrude5_sk2:
        with Locations(Location((-40, -83.981493427, 0), (0, 0, 180))):
            Circle(SKETCH10_R)
    cut_extrude5_tool2 = extrude(cut_extrude5_sk2.sketch, amount=-CUT_EXTRUDE5_REACH, mode=Mode.PRIVATE) & part.part
    add(cut_extrude5_tool1.solids().sort_by_distance((-40, -83.981493, 44.12132))[0], mode=Mode.SUBTRACT)
    add(cut_extrude5_tool2.solids().sort_by_distance((40, -83.981493, 44.12132))[0], mode=Mode.SUBTRACT)

    # Fillet3
    fillet3_edges = [part.edges().sort_by_distance(p)[0] for p in [
        (-45, -68.550258061, 48.121320344),
        (-35, -59.74810321, 46.121320344),
        (-35, -68.550258061, 48.121320344),
        (-40, -56.377183724, 44.121320344),
        (-45, -59.74810321, 46.121320344),
        (35, -68.550258061, 48.121320344),
        (45, -59.74810321, 46.121320344),
        (45, -68.550258061, 48.121320344),
        (40, -56.377183724, 44.121320344),
        (35, -59.74810321, 46.121320344),
    ]]
    fillet(fillet3_edges, radius=FILLET3_R)

    # Fillet4
    fillet4_edges = [part.edges().sort_by_distance(p)[0] for p in [
        (-45, -88.981493427, 46.121320344),
        (-35, -88.981493427, 46.121320344),
        (35, -88.981493427, 46.121320344),
        (45, -88.981493427, 46.121320344),
    ]]
    fillet(fillet4_edges, radius=FILLET4_R - 0.0001)  # a hair under: the kernel refuses the full size


solid = part.part
